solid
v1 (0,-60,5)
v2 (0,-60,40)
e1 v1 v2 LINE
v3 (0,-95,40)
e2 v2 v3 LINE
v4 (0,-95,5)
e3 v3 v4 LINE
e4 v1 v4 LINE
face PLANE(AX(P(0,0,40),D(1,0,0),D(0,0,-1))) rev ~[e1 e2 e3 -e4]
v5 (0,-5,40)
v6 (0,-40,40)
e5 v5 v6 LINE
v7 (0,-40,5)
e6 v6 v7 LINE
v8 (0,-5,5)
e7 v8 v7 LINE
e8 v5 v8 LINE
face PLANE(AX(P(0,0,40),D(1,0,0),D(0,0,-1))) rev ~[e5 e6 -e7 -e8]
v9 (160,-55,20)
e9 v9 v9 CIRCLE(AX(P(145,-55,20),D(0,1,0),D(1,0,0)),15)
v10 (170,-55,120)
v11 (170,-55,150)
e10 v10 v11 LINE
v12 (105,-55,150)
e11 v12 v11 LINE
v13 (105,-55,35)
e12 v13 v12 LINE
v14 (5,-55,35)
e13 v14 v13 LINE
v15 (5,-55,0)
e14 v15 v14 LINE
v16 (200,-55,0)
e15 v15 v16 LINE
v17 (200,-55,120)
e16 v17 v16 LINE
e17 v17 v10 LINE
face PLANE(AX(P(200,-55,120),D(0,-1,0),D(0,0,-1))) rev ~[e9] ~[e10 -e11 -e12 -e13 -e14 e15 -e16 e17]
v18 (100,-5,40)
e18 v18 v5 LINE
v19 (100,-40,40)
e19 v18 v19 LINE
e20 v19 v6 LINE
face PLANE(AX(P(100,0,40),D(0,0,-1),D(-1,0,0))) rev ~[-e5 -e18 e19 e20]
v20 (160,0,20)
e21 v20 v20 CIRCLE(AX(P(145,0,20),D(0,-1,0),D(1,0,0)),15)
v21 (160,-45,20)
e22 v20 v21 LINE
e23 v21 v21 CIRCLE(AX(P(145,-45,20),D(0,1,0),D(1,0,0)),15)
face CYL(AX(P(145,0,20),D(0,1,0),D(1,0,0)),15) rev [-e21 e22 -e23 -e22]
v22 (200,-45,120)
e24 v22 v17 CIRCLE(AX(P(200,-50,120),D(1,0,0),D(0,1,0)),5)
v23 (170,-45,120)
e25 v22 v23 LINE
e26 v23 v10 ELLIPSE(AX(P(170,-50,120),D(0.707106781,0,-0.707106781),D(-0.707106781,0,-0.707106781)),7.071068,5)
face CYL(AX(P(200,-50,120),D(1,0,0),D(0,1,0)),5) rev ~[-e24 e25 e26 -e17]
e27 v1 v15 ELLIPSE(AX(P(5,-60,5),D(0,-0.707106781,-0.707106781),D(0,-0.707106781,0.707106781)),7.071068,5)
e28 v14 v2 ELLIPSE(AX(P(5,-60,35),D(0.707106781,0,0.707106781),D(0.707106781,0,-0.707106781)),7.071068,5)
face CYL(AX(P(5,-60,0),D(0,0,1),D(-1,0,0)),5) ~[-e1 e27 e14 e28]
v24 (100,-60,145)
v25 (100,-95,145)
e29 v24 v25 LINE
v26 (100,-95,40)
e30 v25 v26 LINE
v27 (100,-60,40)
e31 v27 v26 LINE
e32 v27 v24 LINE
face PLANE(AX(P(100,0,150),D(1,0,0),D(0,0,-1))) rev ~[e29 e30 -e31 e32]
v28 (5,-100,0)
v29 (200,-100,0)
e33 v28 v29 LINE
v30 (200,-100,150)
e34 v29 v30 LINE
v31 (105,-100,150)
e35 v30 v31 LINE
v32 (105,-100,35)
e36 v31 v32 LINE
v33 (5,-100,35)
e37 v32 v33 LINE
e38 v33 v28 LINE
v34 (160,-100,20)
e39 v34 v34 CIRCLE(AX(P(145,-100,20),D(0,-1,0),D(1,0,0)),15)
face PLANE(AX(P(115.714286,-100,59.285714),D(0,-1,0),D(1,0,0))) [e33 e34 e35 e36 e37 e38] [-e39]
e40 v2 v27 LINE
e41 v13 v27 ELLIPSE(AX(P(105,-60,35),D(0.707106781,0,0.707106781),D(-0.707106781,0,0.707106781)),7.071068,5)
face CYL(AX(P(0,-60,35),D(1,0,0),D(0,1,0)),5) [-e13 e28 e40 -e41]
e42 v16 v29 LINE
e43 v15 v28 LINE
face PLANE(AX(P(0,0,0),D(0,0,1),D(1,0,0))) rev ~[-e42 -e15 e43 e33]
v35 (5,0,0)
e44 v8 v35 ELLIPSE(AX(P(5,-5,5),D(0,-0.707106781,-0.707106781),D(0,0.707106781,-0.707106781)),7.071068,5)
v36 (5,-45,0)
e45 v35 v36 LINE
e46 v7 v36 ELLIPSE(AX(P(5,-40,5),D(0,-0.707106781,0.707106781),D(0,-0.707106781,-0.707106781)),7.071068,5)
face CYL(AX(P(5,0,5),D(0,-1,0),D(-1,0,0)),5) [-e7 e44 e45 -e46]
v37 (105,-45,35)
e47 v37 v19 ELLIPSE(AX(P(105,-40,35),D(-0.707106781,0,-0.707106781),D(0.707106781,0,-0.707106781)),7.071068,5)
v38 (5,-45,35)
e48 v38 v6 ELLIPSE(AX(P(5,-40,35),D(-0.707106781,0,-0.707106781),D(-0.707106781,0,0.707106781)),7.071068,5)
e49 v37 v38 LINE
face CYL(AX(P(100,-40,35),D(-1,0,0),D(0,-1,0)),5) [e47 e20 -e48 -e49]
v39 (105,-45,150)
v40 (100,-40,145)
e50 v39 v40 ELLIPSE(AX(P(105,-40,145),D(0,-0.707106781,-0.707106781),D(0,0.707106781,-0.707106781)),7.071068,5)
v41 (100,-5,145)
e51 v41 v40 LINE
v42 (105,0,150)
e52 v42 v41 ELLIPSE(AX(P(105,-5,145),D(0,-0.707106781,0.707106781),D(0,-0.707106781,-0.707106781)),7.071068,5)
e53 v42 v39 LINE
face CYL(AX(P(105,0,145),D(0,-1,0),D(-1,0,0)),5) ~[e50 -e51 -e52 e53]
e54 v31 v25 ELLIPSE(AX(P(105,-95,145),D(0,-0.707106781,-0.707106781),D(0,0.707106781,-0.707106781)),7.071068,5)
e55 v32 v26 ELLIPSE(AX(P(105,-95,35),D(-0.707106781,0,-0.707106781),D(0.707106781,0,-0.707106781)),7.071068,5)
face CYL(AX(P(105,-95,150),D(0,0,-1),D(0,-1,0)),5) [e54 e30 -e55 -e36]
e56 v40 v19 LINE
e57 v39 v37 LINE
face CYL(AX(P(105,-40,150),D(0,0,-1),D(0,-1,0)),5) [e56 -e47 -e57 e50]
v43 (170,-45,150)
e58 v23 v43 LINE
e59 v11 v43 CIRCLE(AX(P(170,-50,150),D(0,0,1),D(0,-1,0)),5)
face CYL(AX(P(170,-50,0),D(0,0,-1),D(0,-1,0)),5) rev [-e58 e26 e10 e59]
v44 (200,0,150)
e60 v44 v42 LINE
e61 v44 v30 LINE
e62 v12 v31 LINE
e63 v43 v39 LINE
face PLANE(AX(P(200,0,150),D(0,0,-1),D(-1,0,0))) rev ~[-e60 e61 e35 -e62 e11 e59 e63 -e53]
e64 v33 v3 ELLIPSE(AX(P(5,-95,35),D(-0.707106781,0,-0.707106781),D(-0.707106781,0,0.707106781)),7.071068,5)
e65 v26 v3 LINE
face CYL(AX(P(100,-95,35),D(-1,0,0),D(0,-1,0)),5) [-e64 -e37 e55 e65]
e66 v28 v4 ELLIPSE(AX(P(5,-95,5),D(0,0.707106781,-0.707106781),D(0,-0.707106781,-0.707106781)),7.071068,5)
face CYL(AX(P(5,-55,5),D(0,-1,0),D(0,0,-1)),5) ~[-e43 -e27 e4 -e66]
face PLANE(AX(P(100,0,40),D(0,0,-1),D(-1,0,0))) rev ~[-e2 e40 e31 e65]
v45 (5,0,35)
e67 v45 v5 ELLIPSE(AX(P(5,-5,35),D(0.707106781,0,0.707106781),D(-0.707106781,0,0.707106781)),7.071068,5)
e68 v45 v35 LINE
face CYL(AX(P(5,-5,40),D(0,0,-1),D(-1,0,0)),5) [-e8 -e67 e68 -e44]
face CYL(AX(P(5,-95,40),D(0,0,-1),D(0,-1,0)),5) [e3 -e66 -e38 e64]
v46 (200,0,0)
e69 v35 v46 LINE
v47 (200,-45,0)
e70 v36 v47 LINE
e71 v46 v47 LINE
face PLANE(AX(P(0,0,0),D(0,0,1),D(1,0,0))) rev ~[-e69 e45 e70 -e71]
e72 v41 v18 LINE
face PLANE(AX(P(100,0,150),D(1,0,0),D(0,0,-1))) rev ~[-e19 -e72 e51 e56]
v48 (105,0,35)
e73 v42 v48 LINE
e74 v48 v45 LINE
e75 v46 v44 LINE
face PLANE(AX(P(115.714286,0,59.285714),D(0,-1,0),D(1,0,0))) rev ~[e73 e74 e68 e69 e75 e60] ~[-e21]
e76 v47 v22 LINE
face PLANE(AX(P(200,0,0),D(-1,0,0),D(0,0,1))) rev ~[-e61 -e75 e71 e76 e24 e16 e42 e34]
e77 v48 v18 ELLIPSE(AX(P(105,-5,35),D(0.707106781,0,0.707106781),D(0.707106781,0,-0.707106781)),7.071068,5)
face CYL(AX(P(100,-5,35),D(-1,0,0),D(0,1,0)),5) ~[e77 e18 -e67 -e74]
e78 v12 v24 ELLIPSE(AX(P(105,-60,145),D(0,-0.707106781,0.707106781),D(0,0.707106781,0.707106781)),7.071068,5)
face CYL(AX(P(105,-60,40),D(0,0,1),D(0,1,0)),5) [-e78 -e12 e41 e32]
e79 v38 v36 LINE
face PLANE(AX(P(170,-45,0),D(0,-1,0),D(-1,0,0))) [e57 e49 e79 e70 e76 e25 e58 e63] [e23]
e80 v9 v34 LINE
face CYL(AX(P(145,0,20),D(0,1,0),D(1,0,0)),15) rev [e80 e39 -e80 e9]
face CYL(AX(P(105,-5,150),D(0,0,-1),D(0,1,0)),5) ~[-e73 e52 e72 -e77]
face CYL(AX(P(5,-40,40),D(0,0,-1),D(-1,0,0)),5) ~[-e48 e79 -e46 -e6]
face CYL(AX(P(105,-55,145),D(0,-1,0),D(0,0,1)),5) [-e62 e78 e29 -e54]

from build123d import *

# Parameters (mm, degrees)
F0_R     = 15
F1_DEPTH = 100
F3_DEPTH = 150
F5_R     = 5
F7_DEPTH = 300


# Not quite as in the source:
# - the program builds the solid bodies; features that only make, move or delete a surface that nothing else refers to are left out


with BuildPart() as f1:
    # F0 (on Front) → F1 (new body)
    with BuildSketch(Plane.XZ):
        Polygon((0, 40), (0, 0), (200, 0), (200, 150), (100, 150), (100, 40), align=None)
        with Locations((145, 20)):
            Circle(F0_R, mode=Mode.SUBTRACT)
    extrude(amount=F1_DEPTH)

    # F2 (on Top) → F3 (cut, through all)
    with BuildSketch(Plane.XY):
        with BuildLine():
            Line((-30, -55), (170, -55))
            ThreePointArc((170, -55), (175, -50), (170, -45))
            Line((170, -45), (-30, -45))
            Line((-30, -45), (-30, -55))
        make_face()
    extrude(amount=F3_DEPTH, mode=Mode.SUBTRACT)

    # F5
    f5_edges = [f1.edges().sort_by_distance(p)[0] for p in [
        (100, -45, 95),
        (100, -55, 95),
        (100, -100, 95),
        (50, -100, 40),
        (50, -55, 40),
        (50, -45, 40),
        (100, 0, 95),
        (50, 0, 40),
        (0, 0, 20),
        (0, -45, 20),
        (0, -22.5, 0),
        (0, -55, 20),
        (0, -100, 20),
        (0, -77.5, 0),
        (100, -22.5, 150),
        (100, -77.5, 150),
    ]]
    fillet(f5_edges, radius=F5_R)

    # F6 (on face) → F7 (cut)
    with BuildSketch(Plane.YZ.offset(200)):
        with BuildLine():
            Line((-45, -10), (-45, 120))
            ThreePointArc((-45, 120), (-50, 125), (-55, 120))
            Line((-55, 120), (-55, -10))
            Line((-55, -10), (-45, -10))
        make_face()
    extrude(amount=-F7_DEPTH, mode=Mode.SUBTRACT)


solid = f1.part
